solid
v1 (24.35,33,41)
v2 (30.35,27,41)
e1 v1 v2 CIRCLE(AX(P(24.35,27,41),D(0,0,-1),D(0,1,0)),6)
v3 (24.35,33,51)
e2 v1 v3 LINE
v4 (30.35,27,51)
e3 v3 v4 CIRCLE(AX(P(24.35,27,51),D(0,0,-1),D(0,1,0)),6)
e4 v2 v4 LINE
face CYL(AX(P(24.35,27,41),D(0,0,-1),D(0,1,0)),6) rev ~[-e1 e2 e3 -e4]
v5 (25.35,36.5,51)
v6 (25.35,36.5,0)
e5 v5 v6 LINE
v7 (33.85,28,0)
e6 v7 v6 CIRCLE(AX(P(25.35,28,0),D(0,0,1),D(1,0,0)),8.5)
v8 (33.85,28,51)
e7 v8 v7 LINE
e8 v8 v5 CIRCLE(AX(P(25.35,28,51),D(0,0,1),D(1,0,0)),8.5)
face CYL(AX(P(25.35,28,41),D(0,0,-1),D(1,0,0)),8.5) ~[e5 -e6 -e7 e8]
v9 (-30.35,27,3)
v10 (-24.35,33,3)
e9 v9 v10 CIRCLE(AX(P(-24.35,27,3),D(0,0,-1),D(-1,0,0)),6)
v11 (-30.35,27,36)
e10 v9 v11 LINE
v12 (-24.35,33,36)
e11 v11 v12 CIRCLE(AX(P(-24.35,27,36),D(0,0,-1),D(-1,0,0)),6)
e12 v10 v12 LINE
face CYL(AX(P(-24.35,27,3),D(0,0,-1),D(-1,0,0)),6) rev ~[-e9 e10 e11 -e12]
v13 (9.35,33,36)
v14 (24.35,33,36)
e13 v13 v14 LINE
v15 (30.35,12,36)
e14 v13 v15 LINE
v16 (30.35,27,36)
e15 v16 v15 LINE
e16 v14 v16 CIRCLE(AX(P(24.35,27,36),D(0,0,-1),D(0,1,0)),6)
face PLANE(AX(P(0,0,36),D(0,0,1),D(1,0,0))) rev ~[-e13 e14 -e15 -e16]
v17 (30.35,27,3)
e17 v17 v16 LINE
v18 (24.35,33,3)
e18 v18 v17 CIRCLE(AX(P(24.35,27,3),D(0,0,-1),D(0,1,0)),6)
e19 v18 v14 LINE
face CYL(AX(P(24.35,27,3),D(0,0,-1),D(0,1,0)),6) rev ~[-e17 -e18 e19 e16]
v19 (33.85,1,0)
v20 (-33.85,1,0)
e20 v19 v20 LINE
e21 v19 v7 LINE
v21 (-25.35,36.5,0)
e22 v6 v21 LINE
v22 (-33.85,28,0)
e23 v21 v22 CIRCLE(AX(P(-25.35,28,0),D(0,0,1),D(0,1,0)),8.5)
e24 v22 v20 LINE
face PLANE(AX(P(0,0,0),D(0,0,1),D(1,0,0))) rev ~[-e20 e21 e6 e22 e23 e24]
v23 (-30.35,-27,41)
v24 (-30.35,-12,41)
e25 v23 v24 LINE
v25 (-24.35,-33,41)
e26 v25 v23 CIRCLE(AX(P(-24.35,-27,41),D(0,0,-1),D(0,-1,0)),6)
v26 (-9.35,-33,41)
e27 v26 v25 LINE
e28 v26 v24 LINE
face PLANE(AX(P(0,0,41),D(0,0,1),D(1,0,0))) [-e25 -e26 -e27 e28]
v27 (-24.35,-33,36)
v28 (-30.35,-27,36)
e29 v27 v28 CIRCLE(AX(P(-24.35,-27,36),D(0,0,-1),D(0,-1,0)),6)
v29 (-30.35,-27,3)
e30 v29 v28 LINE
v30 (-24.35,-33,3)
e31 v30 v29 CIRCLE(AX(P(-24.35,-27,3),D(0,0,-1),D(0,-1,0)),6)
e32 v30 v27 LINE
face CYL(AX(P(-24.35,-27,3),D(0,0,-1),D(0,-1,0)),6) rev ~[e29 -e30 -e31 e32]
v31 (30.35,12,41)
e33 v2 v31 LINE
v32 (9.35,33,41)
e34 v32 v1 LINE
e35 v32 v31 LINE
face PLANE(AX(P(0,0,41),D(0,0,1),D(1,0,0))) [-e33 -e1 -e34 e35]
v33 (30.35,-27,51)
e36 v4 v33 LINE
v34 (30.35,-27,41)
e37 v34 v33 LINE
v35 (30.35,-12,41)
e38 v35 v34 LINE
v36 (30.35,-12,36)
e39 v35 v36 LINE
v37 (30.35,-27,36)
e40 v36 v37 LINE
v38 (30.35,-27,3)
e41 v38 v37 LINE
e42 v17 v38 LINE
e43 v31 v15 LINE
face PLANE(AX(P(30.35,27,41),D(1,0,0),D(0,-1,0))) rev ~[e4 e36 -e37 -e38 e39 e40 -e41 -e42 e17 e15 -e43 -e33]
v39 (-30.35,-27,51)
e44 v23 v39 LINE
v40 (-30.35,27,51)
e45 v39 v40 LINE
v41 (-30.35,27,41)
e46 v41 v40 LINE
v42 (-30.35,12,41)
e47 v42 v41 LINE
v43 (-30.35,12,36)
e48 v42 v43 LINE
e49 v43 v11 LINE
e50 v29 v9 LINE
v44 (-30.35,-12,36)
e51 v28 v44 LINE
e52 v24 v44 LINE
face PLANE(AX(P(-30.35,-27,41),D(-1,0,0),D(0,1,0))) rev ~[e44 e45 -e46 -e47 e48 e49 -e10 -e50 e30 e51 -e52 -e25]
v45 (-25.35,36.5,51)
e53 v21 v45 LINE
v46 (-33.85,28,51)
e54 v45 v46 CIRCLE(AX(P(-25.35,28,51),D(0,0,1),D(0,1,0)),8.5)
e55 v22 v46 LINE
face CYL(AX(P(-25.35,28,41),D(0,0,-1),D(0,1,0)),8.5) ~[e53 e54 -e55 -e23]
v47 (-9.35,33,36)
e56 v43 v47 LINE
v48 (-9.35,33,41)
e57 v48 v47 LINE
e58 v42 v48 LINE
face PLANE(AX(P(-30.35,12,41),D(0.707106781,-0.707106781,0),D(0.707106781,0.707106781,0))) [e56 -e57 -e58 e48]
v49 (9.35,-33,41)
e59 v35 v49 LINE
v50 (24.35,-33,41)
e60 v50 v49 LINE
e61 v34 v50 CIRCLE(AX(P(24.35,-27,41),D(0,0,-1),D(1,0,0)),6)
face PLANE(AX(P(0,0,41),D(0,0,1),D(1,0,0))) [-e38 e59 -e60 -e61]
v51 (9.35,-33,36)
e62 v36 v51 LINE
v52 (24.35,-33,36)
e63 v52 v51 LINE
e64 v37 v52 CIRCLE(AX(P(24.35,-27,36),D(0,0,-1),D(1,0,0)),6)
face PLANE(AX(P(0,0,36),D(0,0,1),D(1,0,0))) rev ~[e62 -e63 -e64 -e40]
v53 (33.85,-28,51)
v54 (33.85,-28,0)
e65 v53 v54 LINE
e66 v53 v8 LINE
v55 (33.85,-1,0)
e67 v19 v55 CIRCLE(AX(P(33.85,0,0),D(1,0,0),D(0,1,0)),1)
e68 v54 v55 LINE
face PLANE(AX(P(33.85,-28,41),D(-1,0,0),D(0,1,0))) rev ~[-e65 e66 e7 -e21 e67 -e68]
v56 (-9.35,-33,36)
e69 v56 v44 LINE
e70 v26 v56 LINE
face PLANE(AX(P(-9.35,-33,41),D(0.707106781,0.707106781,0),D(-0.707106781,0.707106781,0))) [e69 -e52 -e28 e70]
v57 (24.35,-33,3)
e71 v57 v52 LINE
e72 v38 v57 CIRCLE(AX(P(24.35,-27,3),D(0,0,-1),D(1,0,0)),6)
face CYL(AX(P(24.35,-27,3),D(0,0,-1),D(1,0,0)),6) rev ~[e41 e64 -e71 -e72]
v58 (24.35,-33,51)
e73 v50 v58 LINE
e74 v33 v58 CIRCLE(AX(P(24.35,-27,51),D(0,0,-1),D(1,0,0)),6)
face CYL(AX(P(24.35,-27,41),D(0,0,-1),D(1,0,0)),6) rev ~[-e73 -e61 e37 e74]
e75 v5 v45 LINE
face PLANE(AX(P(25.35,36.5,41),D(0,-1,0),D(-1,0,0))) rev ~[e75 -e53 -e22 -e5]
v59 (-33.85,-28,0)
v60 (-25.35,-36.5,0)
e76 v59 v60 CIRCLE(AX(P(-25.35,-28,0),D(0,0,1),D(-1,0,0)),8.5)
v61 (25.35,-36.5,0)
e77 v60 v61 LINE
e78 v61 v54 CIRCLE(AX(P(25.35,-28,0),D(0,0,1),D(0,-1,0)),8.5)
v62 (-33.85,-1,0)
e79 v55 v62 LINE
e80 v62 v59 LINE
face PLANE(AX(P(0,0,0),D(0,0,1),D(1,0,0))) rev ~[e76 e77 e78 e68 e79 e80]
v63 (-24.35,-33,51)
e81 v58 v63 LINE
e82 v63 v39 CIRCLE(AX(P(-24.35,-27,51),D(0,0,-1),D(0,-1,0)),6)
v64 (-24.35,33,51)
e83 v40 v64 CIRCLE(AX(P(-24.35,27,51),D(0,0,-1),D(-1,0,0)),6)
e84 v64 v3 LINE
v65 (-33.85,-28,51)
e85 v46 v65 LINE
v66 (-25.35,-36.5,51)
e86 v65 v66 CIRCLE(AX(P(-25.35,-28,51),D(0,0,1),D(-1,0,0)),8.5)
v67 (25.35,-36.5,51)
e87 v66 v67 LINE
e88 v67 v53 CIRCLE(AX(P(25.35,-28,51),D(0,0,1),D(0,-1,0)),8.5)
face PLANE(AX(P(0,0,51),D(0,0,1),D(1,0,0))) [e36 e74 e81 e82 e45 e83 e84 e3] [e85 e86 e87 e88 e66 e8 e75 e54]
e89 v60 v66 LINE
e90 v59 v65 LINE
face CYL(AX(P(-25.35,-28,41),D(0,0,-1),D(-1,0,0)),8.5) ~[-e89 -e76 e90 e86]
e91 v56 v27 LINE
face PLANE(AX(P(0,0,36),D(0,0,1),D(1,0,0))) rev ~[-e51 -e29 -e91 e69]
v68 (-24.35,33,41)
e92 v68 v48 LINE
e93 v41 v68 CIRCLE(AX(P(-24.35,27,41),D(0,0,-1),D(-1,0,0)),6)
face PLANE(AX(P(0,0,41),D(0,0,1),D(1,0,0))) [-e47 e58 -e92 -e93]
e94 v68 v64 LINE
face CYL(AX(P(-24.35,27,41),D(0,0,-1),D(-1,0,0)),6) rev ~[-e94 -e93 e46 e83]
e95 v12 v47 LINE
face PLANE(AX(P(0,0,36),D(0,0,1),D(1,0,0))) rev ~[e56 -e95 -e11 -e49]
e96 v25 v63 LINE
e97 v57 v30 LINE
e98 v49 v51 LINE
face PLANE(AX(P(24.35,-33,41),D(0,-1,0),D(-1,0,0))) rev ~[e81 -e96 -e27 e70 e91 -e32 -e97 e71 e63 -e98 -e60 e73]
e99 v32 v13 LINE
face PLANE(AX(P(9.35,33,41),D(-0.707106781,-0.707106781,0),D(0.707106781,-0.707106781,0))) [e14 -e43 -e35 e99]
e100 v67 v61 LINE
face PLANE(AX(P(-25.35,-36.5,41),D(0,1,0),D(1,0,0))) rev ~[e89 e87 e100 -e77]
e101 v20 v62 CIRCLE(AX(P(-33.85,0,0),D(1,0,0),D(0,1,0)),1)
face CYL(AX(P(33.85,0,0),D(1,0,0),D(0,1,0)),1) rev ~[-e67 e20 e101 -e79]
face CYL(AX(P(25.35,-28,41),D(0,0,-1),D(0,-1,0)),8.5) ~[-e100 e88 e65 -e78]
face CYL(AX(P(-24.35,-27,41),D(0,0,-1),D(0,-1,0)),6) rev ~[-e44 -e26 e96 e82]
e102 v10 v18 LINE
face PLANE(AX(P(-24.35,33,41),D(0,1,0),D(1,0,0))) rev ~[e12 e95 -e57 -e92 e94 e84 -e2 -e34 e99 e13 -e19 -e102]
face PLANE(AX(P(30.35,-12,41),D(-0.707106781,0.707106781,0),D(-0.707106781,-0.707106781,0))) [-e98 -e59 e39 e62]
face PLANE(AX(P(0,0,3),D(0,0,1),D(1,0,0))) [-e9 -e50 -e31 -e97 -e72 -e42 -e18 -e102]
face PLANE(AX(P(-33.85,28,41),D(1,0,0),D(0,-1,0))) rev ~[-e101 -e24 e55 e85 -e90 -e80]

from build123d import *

# Parameters (mm, degrees)
F1_DEPTH = 3
F3_DEPTH = 38
F5_DEPTH = 5
F7_DEPTH = 10
F9_DEPTH = 67.701


# Not quite as in the source:
# - a feature names something its author has since deleted; it is built from what else it names


with BuildPart() as f1:
    # F0 (on Top) → F1 (new body)
    with BuildSketch(Plane.XY):
        with BuildLine():
            Line((-25.35, -36.5), (25.35, -36.5))
            ThreePointArc((25.35, -36.5), (31.3604076401, -34.0104076401), (33.85, -28))
            Line((33.85, -28), (33.85, 28))
            ThreePointArc((33.85, 28), (31.3604076401, 34.0104076401), (25.35, 36.5))
            Line((25.35, 36.5), (-25.35, 36.5))
            ThreePointArc((-25.35, 36.5), (-31.3604076401, 34.0104076401), (-33.85, 28))
            Line((-33.85, 28), (-33.85, -28))
            ThreePointArc((-33.85, -28), (-31.3604076401, -34.0104076401), (-25.35, -36.5))
        make_face()
    extrude(amount=F1_DEPTH)

    # F2 (on face) → F3 (join)
    with BuildSketch(Plane.XY.offset(3)):
        with BuildLine():
            ThreePointArc((-25.35, 36.5), (-31.3604076401, 34.0104076401), (-33.85, 28))
            Line((-33.85, 28), (-33.85, -28))
            ThreePointArc((-33.85, -28), (-31.3604076401, -34.0104076401), (-25.35, -36.5))
            Line((-25.35, -36.5), (25.35, -36.5))
            ThreePointArc((25.35, -36.5), (31.3604076401, -34.0104076401), (33.85, -28))
            Line((33.85, -28), (33.85, 28))
            ThreePointArc((33.85, 28), (31.3604076401, 34.0104076401), (25.35, 36.5))
            Line((25.35, 36.5), (-25.35, 36.5))
        make_face()
        with BuildLine():
            ThreePointArc((30.35, -27), (28.5926406871, -31.2426406871), (24.35, -33))
            Line((24.35, -33), (-24.35, -33))
            ThreePointArc((-24.35, -33), (-28.5926406871, -31.2426406871), (-30.35, -27))
            Line((-30.35, -27), (-30.35, 27))
            ThreePointArc((-30.35, 27), (-28.5926406871, 31.2426406871), (-24.35, 33))
            Line((-24.35, 33), (24.35, 33))
            ThreePointArc((24.35, 33), (28.5926406871, 31.2426406871), (30.35, 27))
            Line((30.35, 27), (30.35, -27))
        make_face(mode=Mode.SUBTRACT)
    extrude(amount=F3_DEPTH)

    # F4 (on face) → F5 (join)
    with BuildSketch(Plane.XY.offset(41)):
        with BuildLine():
            Line((25.35, 36.5), (-25.35, 36.5))
            ThreePointArc((-25.35, 36.5), (-31.3604076401, 34.0104076401), (-33.85, 28))
            Line((-33.85, 28), (-33.85, -28))
            ThreePointArc((-33.85, -28), (-31.3604076401, -34.0104076401), (-25.35, -36.5))
            Line((-25.35, -36.5), (25.35, -36.5))
            ThreePointArc((25.35, -36.5), (31.3604076401, -34.0104076401), (33.85, -28))
            Line((33.85, -28), (33.85, 28))
            ThreePointArc((33.85, 28), (31.3604076401, 34.0104076401), (25.35, 36.5))
        make_face()
        Polygon((24.35, 33), (30.35, 33), (30.35, 27), (30.35, 12), (30.35, -12), (30.35, -27), (30.35, -33), (24.35, -33), (9.35, -33), (-9.35, -33), (-24.35, -33), (-30.35, -33), (-30.35, -27), (-30.35, -12), (-30.35, 12), (-30.35, 27), (-30.35, 33), (-24.35, 33), (-9.35, 33), (9.35, 33), align=None, mode=Mode.SUBTRACT)
        with BuildLine():
            ThreePointArc((-30.35, 27), (-28.5926406871, 31.2426406871), (-24.35, 33))
            Line((-24.35, 33), (-30.35, 33))
            Line((-30.35, 33), (-30.35, 27))
        make_face()
        with BuildLine():
            Line((30.35, 27), (30.35, 33))
            Line((30.35, 33), (24.35, 33))
            ThreePointArc((24.35, 33), (28.5926406871, 31.2426406871), (30.35, 27))
        make_face()
        with BuildLine():
            Line((30.35, -33), (30.35, -27))
            ThreePointArc((30.35, -27), (28.5926406871, -31.2426406871), (24.35, -33))
            Line((24.35, -33), (30.35, -33))
        make_face()
        with BuildLine():
            ThreePointArc((-24.35, -33), (-28.5926406871, -31.2426406871), (-30.35, -27))
            Line((-30.35, -27), (-30.35, -33))
            Line((-30.35, -33), (-24.35, -33))
        make_face()
        with BuildLine():
            Line((30.35, -27), (30.35, -12))
            Line((30.35, -12), (9.35, -33))
            Line((9.35, -33), (24.35, -33))
            ThreePointArc((24.35, -33), (28.5926406871, -31.2426406871), (30.35, -27))
        make_face()
        with BuildLine():
            ThreePointArc((30.35, 27), (28.5926406871, 31.2426406871), (24.35, 33))
            Line((24.35, 33), (9.35, 33))
            Line((9.35, 33), (30.35, 12))
            Line((30.35, 12), (30.35, 27))
        make_face()
        with BuildLine():
            Line((-30.35, 12), (-9.35, 33))
            Line((-9.35, 33), (-24.35, 33))
            ThreePointArc((-24.35, 33), (-28.5926406871, 31.2426406871), (-30.35, 27))
            Line((-30.35, 27), (-30.35, 12))
        make_face()
        with BuildLine():
            Line((-9.35, -33), (-30.35, -12))
            Line((-30.35, -12), (-30.35, -27))
            ThreePointArc((-30.35, -27), (-28.5926406871, -31.2426406871), (-24.35, -33))
            Line((-24.35, -33), (-9.35, -33))
        make_face()
    extrude(amount=-F5_DEPTH)

    # F6 (on face) → F7 (join)
    with BuildSketch(Plane.XY.offset(41)):
        with BuildLine():
            Line((25.35, 36.5), (-25.35, 36.5))
            ThreePointArc((-25.35, 36.5), (-31.3604076401, 34.0104076401), (-33.85, 28))
            Line((-33.85, 28), (-33.85, -28))
            ThreePointArc((-33.85, -28), (-31.3604076401, -34.0104076401), (-25.35, -36.5))
            Line((-25.35, -36.5), (25.35, -36.5))
            ThreePointArc((25.35, -36.5), (31.3604076401, -34.0104076401), (33.85, -28))
            Line((33.85, -28), (33.85, 28))
            ThreePointArc((33.85, 28), (31.3604076401, 34.0104076401), (25.35, 36.5))
        make_face()
        with BuildLine():
            Line((9.35, 33), (24.35, 33))
            ThreePointArc((24.35, 33), (28.5926406871, 31.2426406871), (30.35, 27))
            Line((30.35, 27), (30.35, 12))
            Line((30.35, 12), (30.35, -12))
            Line((30.35, -12), (30.35, -27))
            ThreePointArc((30.35, -27), (28.5926406871, -31.2426406871), (24.35, -33))
            Line((24.35, -33), (9.35, -33))
            Line((9.35, -33), (-9.35, -33))
            Line((-9.35, -33), (-24.35, -33))
            ThreePointArc((-24.35, -33), (-28.5926406871, -31.2426406871), (-30.35, -27))
            Line((-30.35, -27), (-30.35, -12))
            Line((-30.35, -12), (-30.35, 12))
            Line((-30.35, 12), (-30.35, 27))
            ThreePointArc((-30.35, 27), (-28.5926406871, 31.2426406871), (-24.35, 33))
            Line((-24.35, 33), (-9.35, 33))
            Line((-9.35, 33), (9.35, 33))
        make_face(mode=Mode.SUBTRACT)
    extrude(amount=F7_DEPTH)

    # F8 (on face) → F9 (cut, through all)
    with BuildSketch(Plane.YZ.offset(33.85)):
        with BuildLine():
            Line((-1, 0), (1, 0))
            ThreePointArc((1, 0), (0, 1), (-1, 0))
        make_face()
    extrude(amount=-F9_DEPTH, mode=Mode.SUBTRACT)


solid = f1.part
